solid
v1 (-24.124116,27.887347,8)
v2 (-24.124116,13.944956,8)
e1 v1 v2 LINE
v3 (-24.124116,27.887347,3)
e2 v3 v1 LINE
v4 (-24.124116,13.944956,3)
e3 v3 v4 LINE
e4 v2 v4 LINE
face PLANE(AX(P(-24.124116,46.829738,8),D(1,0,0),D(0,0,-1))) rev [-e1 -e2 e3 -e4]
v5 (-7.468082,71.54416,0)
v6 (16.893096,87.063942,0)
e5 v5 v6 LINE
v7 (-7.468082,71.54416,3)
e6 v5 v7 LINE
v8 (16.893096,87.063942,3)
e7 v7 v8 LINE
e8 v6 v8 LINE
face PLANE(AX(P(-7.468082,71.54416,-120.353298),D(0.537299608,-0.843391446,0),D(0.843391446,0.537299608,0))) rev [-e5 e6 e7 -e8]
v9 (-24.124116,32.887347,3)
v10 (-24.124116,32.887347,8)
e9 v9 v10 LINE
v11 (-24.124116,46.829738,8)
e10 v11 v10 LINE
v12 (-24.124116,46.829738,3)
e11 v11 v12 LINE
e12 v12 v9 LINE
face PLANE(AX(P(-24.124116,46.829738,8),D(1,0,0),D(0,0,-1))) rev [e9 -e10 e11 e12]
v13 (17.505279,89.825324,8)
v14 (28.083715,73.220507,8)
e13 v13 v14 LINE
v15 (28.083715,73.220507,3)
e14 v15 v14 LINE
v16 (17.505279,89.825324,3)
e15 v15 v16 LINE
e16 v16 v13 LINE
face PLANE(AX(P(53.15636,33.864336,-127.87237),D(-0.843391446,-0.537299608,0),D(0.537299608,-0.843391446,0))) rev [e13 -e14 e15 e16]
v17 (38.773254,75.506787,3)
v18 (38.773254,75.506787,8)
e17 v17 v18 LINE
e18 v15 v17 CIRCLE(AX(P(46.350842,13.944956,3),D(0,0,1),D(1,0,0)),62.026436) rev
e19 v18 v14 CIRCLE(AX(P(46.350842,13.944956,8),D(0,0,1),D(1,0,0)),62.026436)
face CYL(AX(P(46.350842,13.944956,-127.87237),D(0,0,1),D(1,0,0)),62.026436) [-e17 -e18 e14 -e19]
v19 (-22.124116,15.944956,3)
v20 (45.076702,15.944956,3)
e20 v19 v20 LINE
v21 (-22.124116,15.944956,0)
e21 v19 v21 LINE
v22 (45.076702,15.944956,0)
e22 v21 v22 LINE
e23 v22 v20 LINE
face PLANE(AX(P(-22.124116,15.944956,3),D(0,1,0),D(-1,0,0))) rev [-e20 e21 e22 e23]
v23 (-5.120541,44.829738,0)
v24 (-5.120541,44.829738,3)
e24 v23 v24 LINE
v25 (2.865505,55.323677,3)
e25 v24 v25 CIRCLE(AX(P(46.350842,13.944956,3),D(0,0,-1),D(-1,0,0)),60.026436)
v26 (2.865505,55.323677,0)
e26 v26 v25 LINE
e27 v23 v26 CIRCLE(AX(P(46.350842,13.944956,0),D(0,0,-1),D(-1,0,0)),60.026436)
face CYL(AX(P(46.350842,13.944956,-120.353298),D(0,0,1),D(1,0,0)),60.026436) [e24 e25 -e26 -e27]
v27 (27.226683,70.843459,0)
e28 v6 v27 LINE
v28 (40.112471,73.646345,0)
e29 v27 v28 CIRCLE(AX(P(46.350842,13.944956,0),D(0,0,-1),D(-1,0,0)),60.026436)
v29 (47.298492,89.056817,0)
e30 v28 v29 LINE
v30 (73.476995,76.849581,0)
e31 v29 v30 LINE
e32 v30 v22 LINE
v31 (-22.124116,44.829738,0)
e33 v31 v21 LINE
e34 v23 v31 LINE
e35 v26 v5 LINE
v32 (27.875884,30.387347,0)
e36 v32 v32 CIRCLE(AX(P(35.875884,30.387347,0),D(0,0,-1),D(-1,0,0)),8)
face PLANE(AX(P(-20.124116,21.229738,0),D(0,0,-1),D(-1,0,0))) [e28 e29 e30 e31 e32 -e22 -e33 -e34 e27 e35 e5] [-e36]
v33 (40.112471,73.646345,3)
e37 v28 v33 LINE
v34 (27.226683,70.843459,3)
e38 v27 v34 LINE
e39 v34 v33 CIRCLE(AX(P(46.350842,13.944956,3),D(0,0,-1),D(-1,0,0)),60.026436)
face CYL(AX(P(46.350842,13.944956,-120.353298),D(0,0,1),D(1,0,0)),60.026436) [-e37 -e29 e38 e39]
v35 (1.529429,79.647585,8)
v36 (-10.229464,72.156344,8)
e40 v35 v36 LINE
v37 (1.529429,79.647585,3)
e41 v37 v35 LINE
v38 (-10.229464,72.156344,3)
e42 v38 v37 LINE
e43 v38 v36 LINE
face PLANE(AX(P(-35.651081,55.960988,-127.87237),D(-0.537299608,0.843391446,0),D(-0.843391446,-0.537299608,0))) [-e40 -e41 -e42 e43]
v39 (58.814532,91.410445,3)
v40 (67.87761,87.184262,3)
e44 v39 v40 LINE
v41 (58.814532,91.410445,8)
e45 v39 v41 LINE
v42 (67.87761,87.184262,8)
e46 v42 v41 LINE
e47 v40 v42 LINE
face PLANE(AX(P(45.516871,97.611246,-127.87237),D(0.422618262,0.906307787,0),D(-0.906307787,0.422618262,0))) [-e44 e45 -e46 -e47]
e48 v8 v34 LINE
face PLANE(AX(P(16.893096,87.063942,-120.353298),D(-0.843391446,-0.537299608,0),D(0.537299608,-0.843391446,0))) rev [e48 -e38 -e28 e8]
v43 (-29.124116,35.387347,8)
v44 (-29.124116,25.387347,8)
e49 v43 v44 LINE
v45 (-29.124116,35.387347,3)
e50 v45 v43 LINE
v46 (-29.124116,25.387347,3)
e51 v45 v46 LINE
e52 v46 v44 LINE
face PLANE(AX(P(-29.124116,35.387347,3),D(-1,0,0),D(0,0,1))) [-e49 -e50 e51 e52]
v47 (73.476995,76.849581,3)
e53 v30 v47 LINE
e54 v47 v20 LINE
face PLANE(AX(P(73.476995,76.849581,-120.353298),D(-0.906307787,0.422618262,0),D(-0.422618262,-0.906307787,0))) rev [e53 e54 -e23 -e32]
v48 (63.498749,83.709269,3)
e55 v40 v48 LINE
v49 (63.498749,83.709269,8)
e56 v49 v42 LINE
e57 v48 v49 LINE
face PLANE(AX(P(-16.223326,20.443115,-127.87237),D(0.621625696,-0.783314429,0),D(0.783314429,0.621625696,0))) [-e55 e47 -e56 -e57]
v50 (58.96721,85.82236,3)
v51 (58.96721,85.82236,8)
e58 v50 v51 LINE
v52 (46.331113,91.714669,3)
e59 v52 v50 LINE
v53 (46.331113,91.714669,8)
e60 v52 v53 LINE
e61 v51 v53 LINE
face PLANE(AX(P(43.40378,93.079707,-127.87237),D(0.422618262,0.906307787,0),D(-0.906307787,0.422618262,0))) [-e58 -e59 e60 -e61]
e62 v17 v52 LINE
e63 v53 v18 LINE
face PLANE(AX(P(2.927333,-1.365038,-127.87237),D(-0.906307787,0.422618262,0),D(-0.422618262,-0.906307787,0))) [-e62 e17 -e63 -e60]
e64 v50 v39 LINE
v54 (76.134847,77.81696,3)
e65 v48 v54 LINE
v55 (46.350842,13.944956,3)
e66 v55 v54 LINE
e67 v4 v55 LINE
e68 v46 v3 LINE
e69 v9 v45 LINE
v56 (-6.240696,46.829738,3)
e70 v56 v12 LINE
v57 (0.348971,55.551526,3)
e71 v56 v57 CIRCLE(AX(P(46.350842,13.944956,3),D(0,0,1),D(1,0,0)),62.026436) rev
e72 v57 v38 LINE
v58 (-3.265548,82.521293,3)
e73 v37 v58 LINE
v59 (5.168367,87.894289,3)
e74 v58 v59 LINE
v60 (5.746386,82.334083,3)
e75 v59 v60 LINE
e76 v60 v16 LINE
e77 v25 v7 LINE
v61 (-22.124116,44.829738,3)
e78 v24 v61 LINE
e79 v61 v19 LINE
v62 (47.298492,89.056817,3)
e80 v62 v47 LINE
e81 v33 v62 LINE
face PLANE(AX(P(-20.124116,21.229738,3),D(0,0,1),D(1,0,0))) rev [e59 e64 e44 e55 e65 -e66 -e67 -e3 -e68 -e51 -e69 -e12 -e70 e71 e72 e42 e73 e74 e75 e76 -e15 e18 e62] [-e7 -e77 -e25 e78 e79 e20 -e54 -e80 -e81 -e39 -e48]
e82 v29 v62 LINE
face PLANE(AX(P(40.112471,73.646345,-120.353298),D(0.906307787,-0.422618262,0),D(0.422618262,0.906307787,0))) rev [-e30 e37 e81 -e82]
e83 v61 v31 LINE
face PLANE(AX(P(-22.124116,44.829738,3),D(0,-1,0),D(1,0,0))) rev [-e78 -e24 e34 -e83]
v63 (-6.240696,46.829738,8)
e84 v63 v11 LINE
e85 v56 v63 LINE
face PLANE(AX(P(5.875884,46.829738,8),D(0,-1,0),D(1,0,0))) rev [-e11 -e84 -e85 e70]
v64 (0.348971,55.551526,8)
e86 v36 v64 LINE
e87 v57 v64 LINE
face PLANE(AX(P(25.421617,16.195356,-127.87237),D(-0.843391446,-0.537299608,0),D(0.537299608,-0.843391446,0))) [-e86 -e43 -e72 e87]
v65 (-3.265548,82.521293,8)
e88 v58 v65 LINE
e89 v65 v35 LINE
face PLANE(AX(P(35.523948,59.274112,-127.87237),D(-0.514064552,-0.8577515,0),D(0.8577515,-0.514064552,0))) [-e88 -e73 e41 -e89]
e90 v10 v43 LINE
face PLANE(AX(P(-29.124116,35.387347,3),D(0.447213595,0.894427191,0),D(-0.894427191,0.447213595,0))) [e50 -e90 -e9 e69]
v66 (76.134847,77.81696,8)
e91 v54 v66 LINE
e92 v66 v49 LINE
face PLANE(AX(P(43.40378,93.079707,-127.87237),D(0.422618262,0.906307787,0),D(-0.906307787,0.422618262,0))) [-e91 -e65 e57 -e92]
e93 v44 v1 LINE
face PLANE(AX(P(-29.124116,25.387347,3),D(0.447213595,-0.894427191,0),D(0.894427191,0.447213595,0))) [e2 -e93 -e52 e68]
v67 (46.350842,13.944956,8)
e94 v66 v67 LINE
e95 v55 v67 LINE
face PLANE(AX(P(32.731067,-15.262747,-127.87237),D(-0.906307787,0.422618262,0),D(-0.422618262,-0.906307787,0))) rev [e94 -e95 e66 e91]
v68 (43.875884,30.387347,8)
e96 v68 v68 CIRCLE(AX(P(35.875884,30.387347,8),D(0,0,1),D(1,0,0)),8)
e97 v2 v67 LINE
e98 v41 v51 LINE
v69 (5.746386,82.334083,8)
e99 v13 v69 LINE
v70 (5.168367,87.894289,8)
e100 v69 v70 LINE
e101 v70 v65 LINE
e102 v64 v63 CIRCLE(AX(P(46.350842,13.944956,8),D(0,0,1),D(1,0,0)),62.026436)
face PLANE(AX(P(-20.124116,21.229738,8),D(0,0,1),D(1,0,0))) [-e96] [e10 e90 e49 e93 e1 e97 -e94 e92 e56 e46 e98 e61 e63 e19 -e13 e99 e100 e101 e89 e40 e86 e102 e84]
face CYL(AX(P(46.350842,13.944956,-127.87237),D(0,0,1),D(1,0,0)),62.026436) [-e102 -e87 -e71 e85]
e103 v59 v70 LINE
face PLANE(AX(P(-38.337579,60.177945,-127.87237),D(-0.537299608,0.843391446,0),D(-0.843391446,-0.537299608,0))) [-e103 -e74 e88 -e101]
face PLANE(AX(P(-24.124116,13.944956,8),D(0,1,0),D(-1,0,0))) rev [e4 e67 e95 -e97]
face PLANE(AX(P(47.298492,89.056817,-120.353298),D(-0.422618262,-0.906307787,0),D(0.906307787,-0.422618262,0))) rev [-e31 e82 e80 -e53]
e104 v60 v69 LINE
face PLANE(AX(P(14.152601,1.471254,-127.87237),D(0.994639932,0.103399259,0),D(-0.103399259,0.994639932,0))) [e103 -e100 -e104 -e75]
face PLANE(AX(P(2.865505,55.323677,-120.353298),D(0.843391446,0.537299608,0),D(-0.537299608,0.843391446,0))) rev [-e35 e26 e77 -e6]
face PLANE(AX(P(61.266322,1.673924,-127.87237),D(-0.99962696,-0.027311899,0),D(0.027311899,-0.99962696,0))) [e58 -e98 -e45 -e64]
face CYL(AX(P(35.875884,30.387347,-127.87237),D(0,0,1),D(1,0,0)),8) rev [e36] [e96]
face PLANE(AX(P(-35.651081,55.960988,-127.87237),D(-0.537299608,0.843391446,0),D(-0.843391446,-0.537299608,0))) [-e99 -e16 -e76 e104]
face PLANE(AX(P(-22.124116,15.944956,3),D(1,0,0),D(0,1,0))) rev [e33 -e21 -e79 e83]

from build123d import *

# Parameters (mm, degrees)
F_1_1_2_2_6_BASE_SUJETADOR_OUTLINE_W   = 26
F_1_1_2_2_6_BASE_SUJETADOR_OUTLINE_H   = 28.884781413
F_1_1_2_2_6_BASE_SUJETADOR_OUTLINE_R   = 8
F_1_1_2_2_6_BASE_SUJETADOR_DEPTH       = 8
F_1_1_2_2_6_BASE_SUJETADOR_START       = 3
F_1_1_2_2_6_BASE_SUJETADOR_2_OUTLINE_W = 26
F_1_1_2_2_6_BASE_SUJETADOR_2_OUTLINE_H = 28.884781413
F_1_1_2_2_6_BASE_SUJETADOR_2_DEPTH     = 5
CROQUIS2_R                             = 8
SALIENTE_EXTRUIR1_DEPTH                = 5
CROQUIS3_R                             = 8
SALIENTE_EXTRUIR2_DEPTH                = 3


# Read off the part's stored shape, not the designer's step: 1.1.2.2.6_Base_Sujetador
with BuildPart() as part:
    # 1.1.2.2.6_Base_Sujetador outline → 1.1.2.2.6_Base_Sujetador (new body)
    with BuildSketch(Plane.XY):
        with Locations((-9.12411578, 30.387347077)):
            Rectangle(F_1_1_2_2_6_BASE_SUJETADOR_OUTLINE_W, F_1_1_2_2_6_BASE_SUJETADOR_OUTLINE_H)
        with Locations((-9.12411578, 30.387347076)):
            Circle(F_1_1_2_2_6_BASE_SUJETADOR_OUTLINE_R, mode=Mode.SUBTRACT)
    extrude(amount=F_1_1_2_2_6_BASE_SUJETADOR_DEPTH)

    # 1.1.2.2.6_Base_Sujetador 2 outline → 1.1.2.2.6_Base_Sujetador 2 (add)
    with BuildSketch(Plane.XY.offset(F_1_1_2_2_6_BASE_SUJETADOR_START)):
        Polygon((-24.12411578, 27.887347076), (-24.12411578, 13.94495637), (5.87588422, 13.94495637), (5.87588422, 46.829737783), (-24.12411578, 46.829737783), (-24.12411578, 32.887347076), (-29.12411578, 35.387347076), (-29.12411578, 25.387347076), align=None)
        with Locations((-9.12411578, 30.387347077)):
            Rectangle(F_1_1_2_2_6_BASE_SUJETADOR_2_OUTLINE_W, F_1_1_2_2_6_BASE_SUJETADOR_2_OUTLINE_H, mode=Mode.SUBTRACT)
    extrude(amount=F_1_1_2_2_6_BASE_SUJETADOR_2_DEPTH)

    # Croquis2 → Saliente-Extruir1 (add)
    # profile 1 of 2: a face of its own
    with BuildSketch(Plane.XY.offset(8)):
        Polygon((-6.240696441, 46.829737783), (-24.12411578, 46.829737783), (-24.12411578, 32.887347076), (-29.12411578, 35.387347076), (-29.12411578, 25.387347076), (-24.12411578, 27.887347076), (-24.12411578, 13.94495637), (5.87588422, 13.94495637), (5.87588422, 46.829737783), align=None)
    # profile 2 of 2: a face of its own
    with BuildSketch(Plane.XY.offset(8)):
        with BuildLine():
            ThreePointArc((0.348971375, 55.551526377), (-3.138373762, 51.336082183), (-6.240696441, 46.829737783))
            Line((-6.240696441, 46.829737783), (5.87588422, 46.829737783))
            Line((5.87588422, 46.829737783), (5.87588422, 13.94495637))
            Line((5.87588422, 13.94495637), (46.350842356, 13.94495637))
            Line((46.350842356, 13.94495637), (63.456298807, 50.627726109))
            Line((63.456298807, 50.627726109), (76.134846658, 77.81695972))
            Line((76.134846658, 77.81695972), (63.498749391, 83.709268645))
            Line((63.498749391, 83.709268645), (67.877610167, 87.184261926))
            Line((67.877610167, 87.184261926), (58.814532297, 91.410444543))
            Line((58.814532297, 91.410444543), (58.967210456, 85.822359953))
            Line((58.967210456, 85.822359953), (46.331113188, 91.714668878))
            Line((46.331113188, 91.714668878), (38.773253593, 75.506786672))
            ThreePointArc((38.773253593, 75.506786672), (33.378020355, 74.599590907), (28.083714716, 73.220506552))
            Line((28.083714716, 73.220506552), (17.505279389, 89.825323912))
            Line((17.505279389, 89.825323912), (5.746386333, 82.334082846))
            Line((5.746386333, 82.334082846), (5.168366906, 87.894289096))
            Line((5.168366906, 87.894289096), (-3.265547552, 82.521293012))
            Line((-3.265547552, 82.521293012), (1.529429104, 79.647584804))
            Line((1.529429104, 79.647584804), (-10.229463952, 72.156343738))
            Line((-10.229463952, 72.156343738), (0.348971375, 55.551526377))
        make_face()
        with Locations((35.87588422, 30.387347076)):
            Circle(CROQUIS2_R, mode=Mode.SUBTRACT)
    extrude(amount=-SALIENTE_EXTRUIR1_DEPTH)

    # Croquis3 → Saliente-Extruir2 (add)
    with BuildSketch(Plane(origin=(0, 0, 3), x_dir=(-1, 0, 0), z_dir=(0, 0, -1))):
        with BuildLine():
            Line((-73.476994561, 76.849580669), (-45.076701834, 15.94495637))
            Line((-45.076701834, 15.94495637), (22.12411578, 15.94495637))
            Line((22.12411578, 15.94495637), (22.12411578, 44.829737783))
            Line((22.12411578, 44.829737783), (5.12054128, 44.829737783))
            ThreePointArc((5.12054128, 44.829737783), (1.416566873, 50.296678088), (-2.865505455, 55.32367712))
            Line((-2.865505455, 55.32367712), (7.468081844, 71.544160063))
            Line((7.468081844, 71.544160063), (-16.893095714, 87.063941804))
            Line((-16.893095714, 87.063941804), (-27.226683013, 70.843458861))
            ThreePointArc((-27.226683013, 70.843458861), (-33.592373346, 72.599832764), (-40.112471141, 73.646344803))
            Line((-40.112471141, 73.646344803), (-47.298492239, 89.05681678))
            Line((-47.298492239, 89.05681678), (-73.476994561, 76.849580669))
        make_face()
        with Locations(Location((-35.87588422, 30.387347076, 0), (0, 0, 180))):
            Circle(CROQUIS3_R, mode=Mode.SUBTRACT)
    extrude(amount=SALIENTE_EXTRUIR2_DEPTH)


solid = part.part
